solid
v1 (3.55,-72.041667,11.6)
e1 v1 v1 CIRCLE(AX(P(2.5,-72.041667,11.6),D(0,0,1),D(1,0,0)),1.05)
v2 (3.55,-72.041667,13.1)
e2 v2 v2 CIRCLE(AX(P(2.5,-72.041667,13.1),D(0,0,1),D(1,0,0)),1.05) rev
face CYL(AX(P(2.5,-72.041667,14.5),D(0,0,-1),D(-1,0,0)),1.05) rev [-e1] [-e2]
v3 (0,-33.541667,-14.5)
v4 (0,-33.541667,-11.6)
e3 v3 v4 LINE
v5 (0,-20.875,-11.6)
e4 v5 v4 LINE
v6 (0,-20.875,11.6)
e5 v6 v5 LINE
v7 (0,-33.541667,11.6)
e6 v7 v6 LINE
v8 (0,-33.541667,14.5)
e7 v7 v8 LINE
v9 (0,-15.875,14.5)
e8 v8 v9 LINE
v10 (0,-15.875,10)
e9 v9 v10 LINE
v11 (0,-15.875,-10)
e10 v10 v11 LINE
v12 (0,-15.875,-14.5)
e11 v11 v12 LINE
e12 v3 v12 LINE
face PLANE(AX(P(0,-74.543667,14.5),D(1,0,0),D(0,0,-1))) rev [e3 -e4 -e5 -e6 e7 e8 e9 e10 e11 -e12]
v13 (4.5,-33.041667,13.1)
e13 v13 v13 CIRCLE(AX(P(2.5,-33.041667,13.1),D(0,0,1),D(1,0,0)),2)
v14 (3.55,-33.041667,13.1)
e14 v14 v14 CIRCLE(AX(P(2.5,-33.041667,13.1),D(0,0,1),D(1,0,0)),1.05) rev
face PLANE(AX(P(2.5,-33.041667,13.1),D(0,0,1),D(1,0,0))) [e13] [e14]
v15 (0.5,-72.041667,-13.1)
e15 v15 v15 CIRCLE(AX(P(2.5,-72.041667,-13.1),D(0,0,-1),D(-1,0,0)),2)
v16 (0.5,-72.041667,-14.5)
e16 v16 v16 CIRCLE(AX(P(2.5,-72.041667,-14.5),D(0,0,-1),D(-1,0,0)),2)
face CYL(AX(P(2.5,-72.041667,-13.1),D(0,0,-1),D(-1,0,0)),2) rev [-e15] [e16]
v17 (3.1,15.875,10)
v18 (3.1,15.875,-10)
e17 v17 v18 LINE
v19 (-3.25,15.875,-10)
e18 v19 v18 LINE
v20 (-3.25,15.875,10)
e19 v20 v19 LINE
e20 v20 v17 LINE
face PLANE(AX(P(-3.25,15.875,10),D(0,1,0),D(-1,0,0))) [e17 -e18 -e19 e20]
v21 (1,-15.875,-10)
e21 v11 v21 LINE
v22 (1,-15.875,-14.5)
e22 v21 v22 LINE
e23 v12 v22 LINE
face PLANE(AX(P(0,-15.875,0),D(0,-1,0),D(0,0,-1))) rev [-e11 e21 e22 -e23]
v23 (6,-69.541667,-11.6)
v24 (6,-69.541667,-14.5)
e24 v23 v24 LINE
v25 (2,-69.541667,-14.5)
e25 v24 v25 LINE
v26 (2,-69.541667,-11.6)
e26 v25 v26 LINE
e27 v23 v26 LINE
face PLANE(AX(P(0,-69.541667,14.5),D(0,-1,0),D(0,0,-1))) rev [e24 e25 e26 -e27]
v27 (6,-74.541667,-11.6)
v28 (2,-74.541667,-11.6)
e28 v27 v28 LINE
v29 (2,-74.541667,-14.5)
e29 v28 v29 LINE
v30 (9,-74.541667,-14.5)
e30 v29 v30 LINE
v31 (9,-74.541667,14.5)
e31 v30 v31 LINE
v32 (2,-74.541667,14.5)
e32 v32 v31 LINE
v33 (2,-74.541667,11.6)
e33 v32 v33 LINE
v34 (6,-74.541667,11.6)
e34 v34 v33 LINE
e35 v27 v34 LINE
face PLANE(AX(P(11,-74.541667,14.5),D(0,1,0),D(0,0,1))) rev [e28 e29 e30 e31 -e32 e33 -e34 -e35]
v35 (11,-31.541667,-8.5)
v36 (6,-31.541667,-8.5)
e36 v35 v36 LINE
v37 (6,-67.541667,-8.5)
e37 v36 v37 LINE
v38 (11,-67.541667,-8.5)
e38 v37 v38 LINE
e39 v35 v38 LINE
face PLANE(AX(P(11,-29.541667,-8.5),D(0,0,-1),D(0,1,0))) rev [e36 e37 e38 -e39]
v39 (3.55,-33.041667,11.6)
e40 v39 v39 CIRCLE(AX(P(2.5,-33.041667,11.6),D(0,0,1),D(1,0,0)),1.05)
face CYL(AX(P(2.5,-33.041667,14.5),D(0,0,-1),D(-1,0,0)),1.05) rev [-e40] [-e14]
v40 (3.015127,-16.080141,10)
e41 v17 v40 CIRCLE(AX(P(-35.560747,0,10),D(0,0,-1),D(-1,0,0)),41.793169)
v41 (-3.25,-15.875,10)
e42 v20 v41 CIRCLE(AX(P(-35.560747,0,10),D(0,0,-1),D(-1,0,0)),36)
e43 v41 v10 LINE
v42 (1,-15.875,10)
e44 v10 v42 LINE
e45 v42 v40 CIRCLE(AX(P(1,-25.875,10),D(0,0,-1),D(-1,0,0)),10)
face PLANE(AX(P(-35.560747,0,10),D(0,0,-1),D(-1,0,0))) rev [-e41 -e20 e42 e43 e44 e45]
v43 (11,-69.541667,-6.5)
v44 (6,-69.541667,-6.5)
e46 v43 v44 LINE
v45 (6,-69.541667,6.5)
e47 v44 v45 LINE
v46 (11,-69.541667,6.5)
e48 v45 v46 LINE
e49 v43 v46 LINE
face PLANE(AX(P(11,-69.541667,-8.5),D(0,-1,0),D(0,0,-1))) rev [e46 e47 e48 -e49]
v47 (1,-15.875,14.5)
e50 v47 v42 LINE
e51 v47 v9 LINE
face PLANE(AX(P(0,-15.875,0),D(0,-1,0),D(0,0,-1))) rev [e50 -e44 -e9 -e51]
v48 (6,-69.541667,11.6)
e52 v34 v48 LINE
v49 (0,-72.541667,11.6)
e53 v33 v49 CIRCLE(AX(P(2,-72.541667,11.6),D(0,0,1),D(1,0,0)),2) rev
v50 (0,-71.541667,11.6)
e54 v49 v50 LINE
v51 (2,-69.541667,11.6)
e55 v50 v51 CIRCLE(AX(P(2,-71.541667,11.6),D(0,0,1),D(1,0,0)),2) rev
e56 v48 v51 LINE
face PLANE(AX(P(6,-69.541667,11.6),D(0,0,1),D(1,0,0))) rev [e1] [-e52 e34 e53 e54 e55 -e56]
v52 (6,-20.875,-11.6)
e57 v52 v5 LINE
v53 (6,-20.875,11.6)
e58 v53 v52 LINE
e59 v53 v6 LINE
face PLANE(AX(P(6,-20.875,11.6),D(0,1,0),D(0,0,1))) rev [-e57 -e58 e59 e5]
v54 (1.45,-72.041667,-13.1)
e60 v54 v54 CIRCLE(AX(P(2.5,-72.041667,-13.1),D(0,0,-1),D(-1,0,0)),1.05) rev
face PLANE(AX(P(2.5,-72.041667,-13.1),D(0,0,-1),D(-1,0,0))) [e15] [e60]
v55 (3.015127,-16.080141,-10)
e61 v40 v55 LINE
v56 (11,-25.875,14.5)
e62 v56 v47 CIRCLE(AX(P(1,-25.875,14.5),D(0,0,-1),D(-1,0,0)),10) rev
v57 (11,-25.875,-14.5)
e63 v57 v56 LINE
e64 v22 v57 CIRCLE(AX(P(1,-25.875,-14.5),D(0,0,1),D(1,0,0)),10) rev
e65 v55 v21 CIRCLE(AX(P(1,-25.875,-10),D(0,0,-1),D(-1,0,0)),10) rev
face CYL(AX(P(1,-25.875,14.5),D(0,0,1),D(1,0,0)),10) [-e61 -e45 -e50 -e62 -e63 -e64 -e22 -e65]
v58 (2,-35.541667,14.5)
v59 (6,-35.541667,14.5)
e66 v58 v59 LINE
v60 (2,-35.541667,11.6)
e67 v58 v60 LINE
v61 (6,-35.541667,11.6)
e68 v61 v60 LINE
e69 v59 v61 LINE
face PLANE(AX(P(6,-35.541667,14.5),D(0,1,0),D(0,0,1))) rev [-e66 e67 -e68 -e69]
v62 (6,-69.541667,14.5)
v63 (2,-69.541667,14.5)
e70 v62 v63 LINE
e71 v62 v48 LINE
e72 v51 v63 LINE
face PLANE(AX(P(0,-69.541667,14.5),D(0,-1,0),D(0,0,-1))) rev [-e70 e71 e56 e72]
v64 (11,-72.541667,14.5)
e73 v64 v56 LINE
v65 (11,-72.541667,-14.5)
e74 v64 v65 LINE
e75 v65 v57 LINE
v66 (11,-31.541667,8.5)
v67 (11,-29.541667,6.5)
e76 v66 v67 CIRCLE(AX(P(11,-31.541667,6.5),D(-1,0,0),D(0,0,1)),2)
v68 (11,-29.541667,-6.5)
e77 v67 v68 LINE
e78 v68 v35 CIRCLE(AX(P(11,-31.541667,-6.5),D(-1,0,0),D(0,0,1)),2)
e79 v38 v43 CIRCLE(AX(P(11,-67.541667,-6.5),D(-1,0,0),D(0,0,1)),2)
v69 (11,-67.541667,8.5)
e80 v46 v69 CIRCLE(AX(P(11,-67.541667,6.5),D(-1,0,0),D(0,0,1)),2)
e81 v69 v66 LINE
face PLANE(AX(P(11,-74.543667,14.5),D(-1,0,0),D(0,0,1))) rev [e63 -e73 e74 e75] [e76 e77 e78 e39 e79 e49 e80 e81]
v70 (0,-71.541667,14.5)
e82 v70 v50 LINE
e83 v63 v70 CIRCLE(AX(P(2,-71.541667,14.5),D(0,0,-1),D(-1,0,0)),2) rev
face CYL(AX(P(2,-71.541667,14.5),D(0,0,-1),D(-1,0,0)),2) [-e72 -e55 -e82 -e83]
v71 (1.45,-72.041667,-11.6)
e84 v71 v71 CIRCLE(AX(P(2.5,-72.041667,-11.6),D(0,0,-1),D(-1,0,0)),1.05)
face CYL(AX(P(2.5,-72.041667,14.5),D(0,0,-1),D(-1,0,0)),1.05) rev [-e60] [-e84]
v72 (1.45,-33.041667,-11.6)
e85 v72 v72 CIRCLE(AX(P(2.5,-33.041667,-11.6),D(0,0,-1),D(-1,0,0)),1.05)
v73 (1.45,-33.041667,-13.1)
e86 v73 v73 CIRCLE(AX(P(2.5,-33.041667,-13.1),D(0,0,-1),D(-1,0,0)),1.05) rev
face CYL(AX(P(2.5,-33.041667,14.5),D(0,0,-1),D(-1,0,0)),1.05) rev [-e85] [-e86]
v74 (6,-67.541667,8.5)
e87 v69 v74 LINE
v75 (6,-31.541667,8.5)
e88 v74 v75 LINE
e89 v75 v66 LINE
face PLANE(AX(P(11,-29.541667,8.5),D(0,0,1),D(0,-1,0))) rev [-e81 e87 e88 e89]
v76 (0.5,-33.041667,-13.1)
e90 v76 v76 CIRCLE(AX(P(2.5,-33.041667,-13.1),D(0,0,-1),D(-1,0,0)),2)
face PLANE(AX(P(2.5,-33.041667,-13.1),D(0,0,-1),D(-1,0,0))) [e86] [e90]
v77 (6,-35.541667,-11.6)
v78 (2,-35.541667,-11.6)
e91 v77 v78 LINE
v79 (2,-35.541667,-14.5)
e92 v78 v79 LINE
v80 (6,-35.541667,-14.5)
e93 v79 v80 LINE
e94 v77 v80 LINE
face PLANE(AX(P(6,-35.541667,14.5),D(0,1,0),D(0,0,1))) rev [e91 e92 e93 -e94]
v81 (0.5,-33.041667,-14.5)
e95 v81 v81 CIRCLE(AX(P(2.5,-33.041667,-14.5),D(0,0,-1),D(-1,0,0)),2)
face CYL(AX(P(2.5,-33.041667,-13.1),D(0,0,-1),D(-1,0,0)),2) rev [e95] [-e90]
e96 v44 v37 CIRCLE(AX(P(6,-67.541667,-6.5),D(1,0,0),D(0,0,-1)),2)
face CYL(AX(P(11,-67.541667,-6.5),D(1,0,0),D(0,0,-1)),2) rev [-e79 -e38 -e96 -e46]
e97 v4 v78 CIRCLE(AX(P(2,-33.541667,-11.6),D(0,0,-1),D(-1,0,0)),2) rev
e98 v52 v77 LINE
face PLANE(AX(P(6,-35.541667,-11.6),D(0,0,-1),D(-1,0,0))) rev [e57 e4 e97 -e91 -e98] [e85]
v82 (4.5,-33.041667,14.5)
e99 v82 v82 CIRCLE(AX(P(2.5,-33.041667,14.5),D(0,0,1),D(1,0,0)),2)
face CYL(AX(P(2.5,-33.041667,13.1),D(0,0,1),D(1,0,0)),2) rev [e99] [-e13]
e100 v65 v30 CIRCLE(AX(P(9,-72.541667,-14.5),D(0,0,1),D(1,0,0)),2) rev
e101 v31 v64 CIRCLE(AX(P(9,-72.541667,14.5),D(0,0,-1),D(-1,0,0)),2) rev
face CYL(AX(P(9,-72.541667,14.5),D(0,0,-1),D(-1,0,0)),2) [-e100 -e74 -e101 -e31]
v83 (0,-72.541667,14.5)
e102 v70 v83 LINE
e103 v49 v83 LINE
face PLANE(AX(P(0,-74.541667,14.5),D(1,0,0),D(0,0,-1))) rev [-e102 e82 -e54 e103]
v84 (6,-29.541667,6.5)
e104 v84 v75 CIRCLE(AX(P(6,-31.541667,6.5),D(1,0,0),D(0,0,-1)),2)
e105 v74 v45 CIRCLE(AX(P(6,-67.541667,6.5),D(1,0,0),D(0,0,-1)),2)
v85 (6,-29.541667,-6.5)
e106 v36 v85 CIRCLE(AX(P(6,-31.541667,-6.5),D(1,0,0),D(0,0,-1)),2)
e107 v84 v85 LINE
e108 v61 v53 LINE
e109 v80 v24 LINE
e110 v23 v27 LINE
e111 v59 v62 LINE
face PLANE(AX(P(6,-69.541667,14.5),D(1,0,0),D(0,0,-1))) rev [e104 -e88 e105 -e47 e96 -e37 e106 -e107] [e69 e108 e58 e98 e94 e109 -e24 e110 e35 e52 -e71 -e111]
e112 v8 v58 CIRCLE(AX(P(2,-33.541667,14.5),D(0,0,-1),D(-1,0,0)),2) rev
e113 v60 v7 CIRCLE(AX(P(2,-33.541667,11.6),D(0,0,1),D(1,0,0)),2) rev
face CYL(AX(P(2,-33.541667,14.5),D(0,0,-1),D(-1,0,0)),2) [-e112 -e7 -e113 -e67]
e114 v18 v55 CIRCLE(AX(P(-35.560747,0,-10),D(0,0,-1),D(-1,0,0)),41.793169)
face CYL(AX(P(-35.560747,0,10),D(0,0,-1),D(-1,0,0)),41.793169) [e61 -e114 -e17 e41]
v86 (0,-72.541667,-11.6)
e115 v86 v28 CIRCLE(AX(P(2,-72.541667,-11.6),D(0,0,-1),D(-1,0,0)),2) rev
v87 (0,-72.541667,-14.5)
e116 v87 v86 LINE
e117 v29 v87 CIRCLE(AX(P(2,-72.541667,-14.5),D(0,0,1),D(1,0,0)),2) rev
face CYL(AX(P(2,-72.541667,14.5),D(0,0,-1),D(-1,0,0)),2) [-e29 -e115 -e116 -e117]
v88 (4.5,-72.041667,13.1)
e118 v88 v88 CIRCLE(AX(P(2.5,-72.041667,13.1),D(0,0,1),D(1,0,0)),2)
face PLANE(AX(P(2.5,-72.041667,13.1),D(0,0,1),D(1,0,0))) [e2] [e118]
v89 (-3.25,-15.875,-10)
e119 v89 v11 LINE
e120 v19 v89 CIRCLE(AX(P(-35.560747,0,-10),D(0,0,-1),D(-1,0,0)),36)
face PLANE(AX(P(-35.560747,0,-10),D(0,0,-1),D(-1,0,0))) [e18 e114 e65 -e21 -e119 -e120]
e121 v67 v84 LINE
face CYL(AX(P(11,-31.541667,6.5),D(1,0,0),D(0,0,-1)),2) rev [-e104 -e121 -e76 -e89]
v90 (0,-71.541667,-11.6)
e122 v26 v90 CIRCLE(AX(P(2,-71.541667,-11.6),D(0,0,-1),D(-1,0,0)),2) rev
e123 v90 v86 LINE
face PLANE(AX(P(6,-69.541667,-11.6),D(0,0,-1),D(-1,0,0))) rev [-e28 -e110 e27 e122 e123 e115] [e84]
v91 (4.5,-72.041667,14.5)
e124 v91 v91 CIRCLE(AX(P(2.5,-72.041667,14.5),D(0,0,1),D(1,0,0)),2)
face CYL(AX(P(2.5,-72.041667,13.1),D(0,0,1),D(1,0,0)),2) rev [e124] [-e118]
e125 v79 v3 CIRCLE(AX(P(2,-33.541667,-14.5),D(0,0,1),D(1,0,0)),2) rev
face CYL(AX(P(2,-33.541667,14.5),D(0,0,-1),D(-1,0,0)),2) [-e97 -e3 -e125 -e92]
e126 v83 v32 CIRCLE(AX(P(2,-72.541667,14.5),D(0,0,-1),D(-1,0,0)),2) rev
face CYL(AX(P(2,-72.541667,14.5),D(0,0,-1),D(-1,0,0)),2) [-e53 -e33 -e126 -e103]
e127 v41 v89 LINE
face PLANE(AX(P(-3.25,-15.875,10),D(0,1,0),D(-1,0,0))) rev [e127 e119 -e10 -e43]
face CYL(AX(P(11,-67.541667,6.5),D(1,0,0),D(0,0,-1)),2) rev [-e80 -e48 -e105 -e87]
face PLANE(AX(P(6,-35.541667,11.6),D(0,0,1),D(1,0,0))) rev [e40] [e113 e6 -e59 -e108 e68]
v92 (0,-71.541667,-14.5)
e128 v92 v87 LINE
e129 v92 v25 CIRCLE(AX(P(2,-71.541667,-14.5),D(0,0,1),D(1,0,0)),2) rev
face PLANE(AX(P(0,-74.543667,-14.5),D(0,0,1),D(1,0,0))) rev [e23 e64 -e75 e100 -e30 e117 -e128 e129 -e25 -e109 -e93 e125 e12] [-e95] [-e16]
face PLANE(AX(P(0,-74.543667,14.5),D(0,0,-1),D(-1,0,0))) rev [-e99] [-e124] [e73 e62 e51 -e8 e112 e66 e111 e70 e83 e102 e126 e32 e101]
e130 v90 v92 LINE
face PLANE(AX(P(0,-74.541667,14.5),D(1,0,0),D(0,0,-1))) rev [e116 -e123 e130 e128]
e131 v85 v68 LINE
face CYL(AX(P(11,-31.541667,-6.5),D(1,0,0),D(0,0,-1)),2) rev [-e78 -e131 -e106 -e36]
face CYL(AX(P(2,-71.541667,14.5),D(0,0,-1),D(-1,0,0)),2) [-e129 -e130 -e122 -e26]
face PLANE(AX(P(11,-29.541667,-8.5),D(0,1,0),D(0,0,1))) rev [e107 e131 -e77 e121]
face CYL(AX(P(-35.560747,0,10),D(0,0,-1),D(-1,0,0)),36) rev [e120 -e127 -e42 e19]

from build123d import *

# Parameters (mm, degrees)
BOSS_EXTRUDE5_DEPTH = 10
BOSS_EXTRUDE6_DEPTH = 14.5
BOSS_EXTRUDE7_REACH = 63.425
SKETCH28_W          = 11
SKETCH28_H          = 29
SKETCH37_W          = 23.2
SKETCH37_H          = 14.666666667
CUT_EXTRUDE10_DEPTH = 6
SKETCH38_W          = 23.2
SKETCH38_H          = 5
CUT_EXTRUDE11_DEPTH = 6
SKETCH39_R          = 1.05
CUT_EXTRUDE12_DEPTH = 81.736980805
SKETCH40_R          = 2
CUT_EXTRUDE13_DEPTH = 1.4
SKETCH41_R          = 2
CUT_EXTRUDE14_DEPTH = 1.4
SKETCH42_W          = 17
SKETCH42_H          = 40
CUT_EXTRUDE15_DEPTH = 77.175521458
FILLET2_R           = 2
CUT_EXTRUDE16_DEPTH = 80.232001549
BOSS_EXTRUDE8_DEPTH = 10
FILLET3_R           = 10


with BuildPart() as part:
    # Sketch25 → Boss-Extrude5 (new, symmetric)
    with BuildSketch(Plane.XY):
        with BuildLine():
            Line((0, 15.875), (6.35, 15.875))
            ThreePointArc((6.35, 15.875), (9.840958299, 0), (6.35, -15.875))
            Line((6.35, -15.875), (0, -15.875))
            ThreePointArc((0, -15.875), (4.187196601, 0), (0, 15.875))
        make_face()
    extrude(amount=BOSS_EXTRUDE5_DEPTH, both=True)


with BuildPart() as body_2:
    # Sketch27 → Boss-Extrude6 (new, symmetric)
    with BuildSketch(Plane.XY):
        Polygon((0, -30.541666667), (11, -30.541666667), (11, -74.541666667), (0, -74.541666667), (0, -69.541666667), (6, -69.541666667), (6, -35.541666667), (0, -35.541666667), align=None)
    extrude(amount=BOSS_EXTRUDE6_DEPTH, both=True)

    # Sketch28 → Boss-Extrude7 (add, up to next)
    with BuildSketch(Plane.XZ.offset(15.875), mode=Mode.PRIVATE) as boss_extrude7_sk1:
        with Locations((5.5, 0)):
            Rectangle(SKETCH28_W, SKETCH28_H)
    boss_extrude7_tool1 = extrude(boss_extrude7_sk1.sketch, amount=BOSS_EXTRUDE7_REACH, mode=Mode.PRIVATE) - body_2.part

    add(part.part)  # Boss-Extrude7 merges part
    add(boss_extrude7_tool1.solids().sort_by_distance((5.5, -15.875, 0))[0])

    # Sketch37 → Cut-Extrude10 (cut)
    with BuildSketch(Plane.ZY):
        with Locations((0, -28.208333334)):
            Rectangle(SKETCH37_W, SKETCH37_H)
    extrude(amount=-CUT_EXTRUDE10_DEPTH, mode=Mode.SUBTRACT)

    # Sketch38 → Cut-Extrude11 (cut)
    with BuildSketch(Plane.ZY):
        with Locations((0, -72.041666667)):
            Rectangle(SKETCH38_W, SKETCH38_H)
    extrude(amount=-CUT_EXTRUDE11_DEPTH, mode=Mode.SUBTRACT)

    # Sketch39 → Cut-Extrude12 (cut, through all)
    with BuildSketch(Plane(origin=(0, 0, -14.5), x_dir=(-1, 0, 0), z_dir=(0, 0, -1))):
        with Locations((-2.5, -33.041666667)):
            Circle(SKETCH39_R)
        with Locations((-2.5, -72.041666667)):
            Circle(SKETCH39_R)
    extrude(amount=-CUT_EXTRUDE12_DEPTH, mode=Mode.SUBTRACT)

    # Sketch40 → Cut-Extrude13 (cut)
    with BuildSketch(Plane(origin=(0, 0, -14.5), x_dir=(-1, 0, 0), z_dir=(0, 0, -1))):
        with Locations((-2.5, -33.041666667)):
            Circle(SKETCH40_R)
        with Locations((-2.5, -72.041666667)):
            Circle(SKETCH40_R)
    extrude(amount=-CUT_EXTRUDE13_DEPTH, mode=Mode.SUBTRACT)

    # Sketch41 → Cut-Extrude14 (cut)
    with BuildSketch(Plane.XY.offset(14.5)):
        with Locations(Location((2.5, -33.041666667, 0), (0, 0, 180))):
            Circle(SKETCH41_R)
        with Locations(Location((2.5, -72.041666667, 0), (0, 0, 180))):
            Circle(SKETCH41_R)
    extrude(amount=-CUT_EXTRUDE14_DEPTH, mode=Mode.SUBTRACT)

    # Sketch42 → Cut-Extrude15 (cut, through all)
    with BuildSketch(Plane.ZY.offset(-6)):
        with Locations((0, -49.541666667)):
            Rectangle(SKETCH42_W, SKETCH42_H)
    extrude(amount=-CUT_EXTRUDE15_DEPTH, mode=Mode.SUBTRACT)

    # Fillet2
    fillet2_edges = [body_2.edges().sort_by_distance(p)[0] for p in [
        (8.5, -69.541666667, -8.5),
        (8.5, -29.541666667, -8.5),
        (8.5, -29.541666667, 8.5),
        (8.5, -69.541666667, 8.5),
        (0, -35.541666667, 13.05),
        (0, -69.541666667, 13.05),
        (0, -74.541666667, 13.05),
        (11, -74.541666667, 0),
        (0, -35.541666667, -13.05),
        (0, -74.541666667, -13.05),
        (0, -69.541666667, -13.05),
    ]]
    fillet(fillet2_edges, radius=FILLET2_R)

    # Sketch44 → Cut-Extrude16 (cut, through all)
    with BuildSketch(Plane.XY.offset(10)):
        with BuildLine():
            Line((6.35, -15.875), (0, -15.875))
            ThreePointArc((0, -15.875), (4.187196601, 0), (0, 15.875))
            Line((0, 15.875), (6.35, 15.875))
            ThreePointArc((6.35, 15.875), (9.840958299, 0), (6.35, -15.875))
        make_face()
    extrude(amount=-CUT_EXTRUDE16_DEPTH, mode=Mode.SUBTRACT)

    # Sketch43 → Boss-Extrude8 (add, symmetric)
    with BuildSketch(Plane.XY):
        with BuildLine():
            Line((-3.25, 15.875), (3.1, 15.875))
            ThreePointArc((3.1, 15.875), (6.232422098, 0), (3.1, -15.875))
            Line((3.1, -15.875), (-3.25, -15.875))
            ThreePointArc((-3.25, -15.875), (0.439252949, 0), (-3.25, 15.875))
        make_face()
    extrude(amount=BOSS_EXTRUDE8_DEPTH, both=True)

    # Fillet3
    # the kernel refuses this fillet: 10 mm, written as the material it takes off along each edge
    with BuildSketch(Plane(origin=(11, -15.875, 39.5), x_dir=(-1, 0, 0), z_dir=(0, 0, -1))) as fillet3_piece_1_section:
        with BuildLine():
            CenterArc((FILLET3_R, -FILLET3_R), FILLET3_R, 90, 90)
            Line((0, -FILLET3_R), (0, 0))
            Line((0, 0), (FILLET3_R, 0))
        make_face()
    fillet3_piece_1 = extrude(amount=79, mode=Mode.PRIVATE)
    fillet3_piece_1 = split(fillet3_piece_1, bisect_by=Plane(origin=(2.190951885, -15.815672455, 10), z_dir=(0, 0, 1)), keep=Keep.TOP, mode=Mode.PRIVATE)
    fillet3_piece_1 = fillet3_piece_1 & Plane(origin=(-35.560747051, 0, 24.75), x_dir=(0.925049424055658, 0.3798467625955178, 0), z_dir=(0, 0, 1)) * Cylinder(41.793169149, 198, mode=Mode.PRIVATE)
    add(fillet3_piece_1, mode=Mode.SUBTRACT)
    with BuildSketch(Plane(origin=(11, -15.875, 39.5), x_dir=(-1, 0, 0), z_dir=(0, 0, -1))) as fillet3_piece_2_section:
        with BuildLine():
            CenterArc((FILLET3_R, -FILLET3_R), FILLET3_R, 90, 90)
            Line((0, -FILLET3_R), (0, 0))
            Line((0, 0), (FILLET3_R, 0))
        make_face()
    fillet3_piece_2 = extrude(amount=79, mode=Mode.PRIVATE)
    fillet3_piece_2 = split(fillet3_piece_2, bisect_by=Plane(origin=(8.886802667, -18.192463431, 10), z_dir=(0, 0, 1)), keep=Keep.TOP, mode=Mode.PRIVATE)
    fillet3_piece_2 = fillet3_piece_2 - Plane(origin=(-35.560747051, 0, 24.75), x_dir=(0.925049424055658, 0.3798467625955178, 0), z_dir=(0, 0, 1)) * Cylinder(41.793169149, 198, mode=Mode.PRIVATE)
    add(fillet3_piece_2, mode=Mode.SUBTRACT)
    with BuildSketch(Plane(origin=(11, -15.875, 39.5), x_dir=(-1, 0, 0), z_dir=(0, 0, -1))) as fillet3_piece_3_section:
        with BuildLine():
            CenterArc((FILLET3_R, -FILLET3_R), FILLET3_R, 90, 90)
            Line((0, -FILLET3_R), (0, 0))
            Line((0, 0), (FILLET3_R, 0))
        make_face()
    fillet3_piece_3 = extrude(amount=79, mode=Mode.PRIVATE)
    fillet3_piece_3 = split(fillet3_piece_3, bisect_by=Plane(origin=(8.886802667, -18.192463431, 10), z_dir=(0, 0, -1)), keep=Keep.TOP, mode=Mode.PRIVATE)
    fillet3_piece_3 = fillet3_piece_3 - Plane(origin=(-35.560747051, 0, 0), x_dir=(0.925049424055658, 0.3798467625955178, 0), z_dir=(0, 0, 1)) * Cylinder(41.793169149, 198, mode=Mode.PRIVATE)
    fillet3_piece_3 = split(fillet3_piece_3, bisect_by=Plane(origin=(8.886802667, -18.192463431, -10), z_dir=(0, 0, 1)), keep=Keep.TOP, mode=Mode.PRIVATE)
    add(fillet3_piece_3, mode=Mode.SUBTRACT)
    with BuildSketch(Plane(origin=(11, -15.875, 39.5), x_dir=(-1, 0, 0), z_dir=(0, 0, -1))) as fillet3_piece_4_section:
        with BuildLine():
            CenterArc((FILLET3_R, -FILLET3_R), FILLET3_R, 90, 90)
            Line((0, -FILLET3_R), (0, 0))
            Line((0, 0), (FILLET3_R, 0))
        make_face()
    fillet3_piece_4 = extrude(amount=79, mode=Mode.PRIVATE)
    fillet3_piece_4 = fillet3_piece_4 & Plane(origin=(-35.560747051, 0, -24.75), x_dir=(0.925049424055658, 0.3798467625955178, 0), z_dir=(0, 0, 1)) * Cylinder(41.793169149, 198, mode=Mode.PRIVATE)
    fillet3_piece_4 = split(fillet3_piece_4, bisect_by=Plane(origin=(2.190951885, -15.815672455, -10), z_dir=(0, 0, -1)), keep=Keep.TOP, mode=Mode.PRIVATE)
    add(fillet3_piece_4, mode=Mode.SUBTRACT)
    with BuildSketch(Plane(origin=(11, -15.875, 39.5), x_dir=(-1, 0, 0), z_dir=(0, 0, -1))) as fillet3_piece_5_section:
        with BuildLine():
            CenterArc((FILLET3_R, -FILLET3_R), FILLET3_R, 90, 90)
            Line((0, -FILLET3_R), (0, 0))
            Line((0, 0), (FILLET3_R, 0))
        make_face()
    fillet3_piece_5 = extrude(amount=79, mode=Mode.PRIVATE)
    fillet3_piece_5 = fillet3_piece_5 - Plane(origin=(-35.560747051, 0, -24.75), x_dir=(0.925049424055658, 0.3798467625955178, 0), z_dir=(0, 0, 1)) * Cylinder(41.793169149, 198, mode=Mode.PRIVATE)
    fillet3_piece_5 = split(fillet3_piece_5, bisect_by=Plane(origin=(8.886802667, -18.192463431, -10), z_dir=(0, 0, -1)), keep=Keep.TOP, mode=Mode.PRIVATE)
    add(fillet3_piece_5, mode=Mode.SUBTRACT)


solid = body_2.part
